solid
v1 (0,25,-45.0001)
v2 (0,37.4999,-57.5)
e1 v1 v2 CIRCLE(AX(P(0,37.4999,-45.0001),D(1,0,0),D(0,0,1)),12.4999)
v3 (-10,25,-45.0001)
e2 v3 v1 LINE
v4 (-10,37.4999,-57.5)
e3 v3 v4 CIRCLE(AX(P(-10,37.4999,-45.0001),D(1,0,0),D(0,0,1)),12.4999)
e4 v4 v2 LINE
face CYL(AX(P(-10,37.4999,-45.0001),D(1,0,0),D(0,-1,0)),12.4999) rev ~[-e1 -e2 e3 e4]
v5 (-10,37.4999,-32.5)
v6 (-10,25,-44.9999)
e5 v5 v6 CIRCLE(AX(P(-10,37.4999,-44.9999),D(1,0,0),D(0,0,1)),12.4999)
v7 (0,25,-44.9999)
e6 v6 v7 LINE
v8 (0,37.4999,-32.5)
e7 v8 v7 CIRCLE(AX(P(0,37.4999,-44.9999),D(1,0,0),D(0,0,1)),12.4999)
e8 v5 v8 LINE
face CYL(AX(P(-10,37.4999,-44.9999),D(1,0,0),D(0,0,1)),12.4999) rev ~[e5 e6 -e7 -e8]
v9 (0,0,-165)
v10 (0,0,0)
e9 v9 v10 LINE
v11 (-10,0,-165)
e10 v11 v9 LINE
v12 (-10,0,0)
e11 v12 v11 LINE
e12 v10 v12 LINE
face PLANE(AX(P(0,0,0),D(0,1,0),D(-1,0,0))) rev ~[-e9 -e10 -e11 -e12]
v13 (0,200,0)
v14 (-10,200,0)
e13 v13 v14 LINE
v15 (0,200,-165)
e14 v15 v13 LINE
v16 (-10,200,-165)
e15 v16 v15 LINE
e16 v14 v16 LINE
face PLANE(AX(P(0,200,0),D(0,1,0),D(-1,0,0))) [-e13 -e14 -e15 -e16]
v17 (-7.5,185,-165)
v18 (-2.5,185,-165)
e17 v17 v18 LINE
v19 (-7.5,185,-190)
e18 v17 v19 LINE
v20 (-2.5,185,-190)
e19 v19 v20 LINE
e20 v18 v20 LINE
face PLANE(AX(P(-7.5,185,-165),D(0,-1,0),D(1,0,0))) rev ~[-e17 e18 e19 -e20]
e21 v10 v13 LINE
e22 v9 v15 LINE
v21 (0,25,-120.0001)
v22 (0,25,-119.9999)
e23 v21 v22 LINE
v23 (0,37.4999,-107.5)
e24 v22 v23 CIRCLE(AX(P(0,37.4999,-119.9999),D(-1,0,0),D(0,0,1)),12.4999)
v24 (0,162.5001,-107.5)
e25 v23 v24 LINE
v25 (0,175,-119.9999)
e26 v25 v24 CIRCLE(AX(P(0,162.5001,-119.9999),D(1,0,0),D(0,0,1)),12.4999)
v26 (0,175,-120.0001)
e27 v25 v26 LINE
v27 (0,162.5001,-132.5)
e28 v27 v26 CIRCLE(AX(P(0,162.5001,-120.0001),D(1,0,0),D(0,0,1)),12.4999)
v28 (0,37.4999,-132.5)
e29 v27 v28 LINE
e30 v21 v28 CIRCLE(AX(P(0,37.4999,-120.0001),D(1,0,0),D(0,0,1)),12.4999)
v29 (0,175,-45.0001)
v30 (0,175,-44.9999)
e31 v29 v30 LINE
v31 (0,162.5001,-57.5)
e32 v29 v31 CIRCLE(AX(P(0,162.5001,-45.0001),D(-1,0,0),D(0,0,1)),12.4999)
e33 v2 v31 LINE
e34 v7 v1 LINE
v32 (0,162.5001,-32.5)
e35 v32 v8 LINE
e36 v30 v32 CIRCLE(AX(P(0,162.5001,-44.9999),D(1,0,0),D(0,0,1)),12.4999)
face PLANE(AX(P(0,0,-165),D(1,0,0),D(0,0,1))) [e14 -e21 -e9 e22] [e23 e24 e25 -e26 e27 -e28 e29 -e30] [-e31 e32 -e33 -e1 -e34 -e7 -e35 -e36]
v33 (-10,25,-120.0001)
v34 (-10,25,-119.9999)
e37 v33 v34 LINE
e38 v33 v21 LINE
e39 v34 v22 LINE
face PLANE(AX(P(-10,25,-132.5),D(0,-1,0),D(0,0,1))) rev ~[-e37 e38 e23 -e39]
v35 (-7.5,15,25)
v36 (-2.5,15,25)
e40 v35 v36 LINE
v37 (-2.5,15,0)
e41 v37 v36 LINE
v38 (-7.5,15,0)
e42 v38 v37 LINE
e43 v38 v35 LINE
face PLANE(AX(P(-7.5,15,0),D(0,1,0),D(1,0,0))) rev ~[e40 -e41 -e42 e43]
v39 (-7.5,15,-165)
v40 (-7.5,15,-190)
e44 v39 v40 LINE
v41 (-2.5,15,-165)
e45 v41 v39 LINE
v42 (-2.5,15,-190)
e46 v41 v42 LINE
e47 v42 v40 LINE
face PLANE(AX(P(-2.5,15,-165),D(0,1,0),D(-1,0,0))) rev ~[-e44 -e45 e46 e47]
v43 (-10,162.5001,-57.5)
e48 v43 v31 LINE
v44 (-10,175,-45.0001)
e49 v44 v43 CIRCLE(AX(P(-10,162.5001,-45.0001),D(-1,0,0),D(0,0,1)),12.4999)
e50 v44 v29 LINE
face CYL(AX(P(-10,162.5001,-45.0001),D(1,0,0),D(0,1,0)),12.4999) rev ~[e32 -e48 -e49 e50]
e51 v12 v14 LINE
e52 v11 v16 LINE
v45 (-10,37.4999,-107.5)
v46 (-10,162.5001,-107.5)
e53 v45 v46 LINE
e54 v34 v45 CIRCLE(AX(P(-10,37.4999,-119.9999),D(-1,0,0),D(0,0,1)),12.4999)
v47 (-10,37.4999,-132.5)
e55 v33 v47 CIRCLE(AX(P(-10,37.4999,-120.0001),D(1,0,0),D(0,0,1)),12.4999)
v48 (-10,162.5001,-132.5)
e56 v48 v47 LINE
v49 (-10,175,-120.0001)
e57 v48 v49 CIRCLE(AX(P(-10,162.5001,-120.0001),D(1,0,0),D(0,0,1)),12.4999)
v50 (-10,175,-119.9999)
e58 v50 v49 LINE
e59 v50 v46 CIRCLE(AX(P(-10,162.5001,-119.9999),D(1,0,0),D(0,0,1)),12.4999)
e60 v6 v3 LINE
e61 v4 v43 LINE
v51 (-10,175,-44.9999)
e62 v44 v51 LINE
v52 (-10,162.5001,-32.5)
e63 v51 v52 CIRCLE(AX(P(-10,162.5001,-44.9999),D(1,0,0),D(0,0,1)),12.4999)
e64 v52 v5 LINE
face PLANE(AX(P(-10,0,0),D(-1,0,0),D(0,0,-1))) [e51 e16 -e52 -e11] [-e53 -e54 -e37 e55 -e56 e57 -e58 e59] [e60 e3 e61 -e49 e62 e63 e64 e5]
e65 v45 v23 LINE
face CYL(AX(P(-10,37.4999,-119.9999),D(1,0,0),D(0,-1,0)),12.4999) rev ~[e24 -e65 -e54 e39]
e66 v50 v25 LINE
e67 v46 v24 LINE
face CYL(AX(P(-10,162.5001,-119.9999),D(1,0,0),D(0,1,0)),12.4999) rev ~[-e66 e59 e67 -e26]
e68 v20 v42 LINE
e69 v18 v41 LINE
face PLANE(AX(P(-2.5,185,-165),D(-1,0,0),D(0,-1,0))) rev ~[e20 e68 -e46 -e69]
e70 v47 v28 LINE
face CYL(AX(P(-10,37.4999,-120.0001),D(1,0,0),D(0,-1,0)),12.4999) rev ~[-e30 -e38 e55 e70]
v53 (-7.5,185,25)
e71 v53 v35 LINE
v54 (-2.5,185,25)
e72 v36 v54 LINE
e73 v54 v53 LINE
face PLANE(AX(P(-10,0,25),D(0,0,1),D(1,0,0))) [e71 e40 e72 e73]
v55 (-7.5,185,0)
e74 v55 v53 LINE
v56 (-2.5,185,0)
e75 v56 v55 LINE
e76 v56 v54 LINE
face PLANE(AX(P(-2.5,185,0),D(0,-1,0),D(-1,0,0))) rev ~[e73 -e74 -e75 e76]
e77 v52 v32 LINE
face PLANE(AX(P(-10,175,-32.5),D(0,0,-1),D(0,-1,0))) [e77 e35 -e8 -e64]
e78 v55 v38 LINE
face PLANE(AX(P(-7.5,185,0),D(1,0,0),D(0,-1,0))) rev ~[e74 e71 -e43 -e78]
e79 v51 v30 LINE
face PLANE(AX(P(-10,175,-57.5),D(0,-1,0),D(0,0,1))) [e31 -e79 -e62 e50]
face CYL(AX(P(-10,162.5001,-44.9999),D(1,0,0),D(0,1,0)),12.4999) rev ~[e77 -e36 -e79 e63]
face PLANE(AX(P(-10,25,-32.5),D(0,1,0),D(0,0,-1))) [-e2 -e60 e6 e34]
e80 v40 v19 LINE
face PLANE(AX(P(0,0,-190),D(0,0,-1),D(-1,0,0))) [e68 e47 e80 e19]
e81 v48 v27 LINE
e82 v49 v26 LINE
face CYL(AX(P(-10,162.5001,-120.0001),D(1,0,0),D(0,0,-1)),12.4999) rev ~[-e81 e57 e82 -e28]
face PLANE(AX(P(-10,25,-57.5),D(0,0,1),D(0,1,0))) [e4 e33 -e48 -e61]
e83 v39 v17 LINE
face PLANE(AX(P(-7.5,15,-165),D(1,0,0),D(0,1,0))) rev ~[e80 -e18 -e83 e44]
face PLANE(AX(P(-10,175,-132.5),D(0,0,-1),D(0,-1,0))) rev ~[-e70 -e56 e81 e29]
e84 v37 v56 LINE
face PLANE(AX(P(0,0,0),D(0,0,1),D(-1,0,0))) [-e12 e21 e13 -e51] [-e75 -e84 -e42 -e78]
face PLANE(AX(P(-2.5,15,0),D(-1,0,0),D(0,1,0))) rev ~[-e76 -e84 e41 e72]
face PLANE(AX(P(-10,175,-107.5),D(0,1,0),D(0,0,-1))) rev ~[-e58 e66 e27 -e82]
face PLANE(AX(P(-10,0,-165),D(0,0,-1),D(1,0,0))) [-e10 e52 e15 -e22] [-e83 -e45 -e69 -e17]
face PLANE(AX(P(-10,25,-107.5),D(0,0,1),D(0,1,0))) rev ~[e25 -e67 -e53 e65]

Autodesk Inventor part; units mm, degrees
ref_plane "YZ Plane" through (0, 0, 0) normal (1, 0, 0) x (0, 1, 0)
ref_plane "XZ Plane" through (0, 0, 0) normal (0, 1, 0) x (-1, 0, 0)
ref_plane "XY Plane" through (0, 0, 0) normal (0, 0, 1) x (1, 0, 0)
sketch "Sketch1" plane through (0, 0, 0) normal (0, 1, 0) x (-1, 0, 0)
  line L0 (0, 0) -> (10, 0)
  line L1 (10, 0) -> (10, -165)
  line L2 (10, -165) -> (0, -165)
  line L3 (0, -165) -> (0, 0)
  dimension "d0" = 10
  dimension "d1" = 165
extrude "Extrusion1" add sketch "Sketch1" along normal blind 200
sketch "Sketch2" plane through (-10, 0, 0) normal (0, 0, 1) x (1, 0, 0)
  line L0 (2.5, 15) -> (7.5, 15)
  line L1 (7.5, 15) -> (7.5, 185)
  line L2 (7.5, 185) -> (2.5, 185)
  line L3 (2.5, 185) -> (2.5, 15)
  point P0 (10, 0)
  dimension "d4" = 5
  dimension "d5" = 170
extrude "Extrusion2" add sketch "Sketch2" along normal blind 25
sketch "Sketch3" plane through (0, 0, -165) normal (0, 0, -1) x (-1, 0, 0)
  line L0 (2.5, 15) -> (7.5, 15)
  line L1 (7.5, 15) -> (7.5, 185)
  line L2 (7.5, 185) -> (2.5, 185)
  line L3 (2.5, 185) -> (2.5, 15)
  point P0 (0, 0)
  dimension "d8" = 5
  dimension "d9" = 170
extrude "Extrusion3" add sketch "Sketch3" along normal blind 25
sketch "Sketch4" plane through (-10, 0, -165) normal (-1, 0, 0) x (0, 0, 1)
  line L0 (0, 200) -> (165, 200) projected
  line L1 (82.5, 200) -> (82.5, 0) construction
  line L2 (0, 0) -> (165, 0) projected
  line L3 (107.5, 175) -> (132.5, 175)
  line L4 (132.5, 175) -> (132.5, 25)
  line L5 (132.5, 25) -> (107.5, 25)
  line L6 (107.5, 25) -> (107.5, 175)
  line L7 (57.5, 175) -> (32.5, 175)
  line L8 (32.5, 175) -> (32.5, 25)
  line L9 (32.5, 25) -> (57.5, 25)
  line L10 (57.5, 25) -> (57.5, 175)
  dimension "d12" = 25
  dimension "d13" = 150
  dimension "d14" = 25
  dimension "d15" = 150
extrude "Extrusion4" cut sketch "Sketch4" against normal blind 10
fillet "Fillet1" radius 12.5 8 edges at (-5, 25, -107.5) (-5, 25, -32.5) (-5, 25, -57.5) (-5, 25, -132.5) (-5, 175, -32.5) (-5, 175, -107.5) (-5, 175, -57.5) (-5, 175, -132.5)
properties part number "TSU_MM_Side_Wall"
